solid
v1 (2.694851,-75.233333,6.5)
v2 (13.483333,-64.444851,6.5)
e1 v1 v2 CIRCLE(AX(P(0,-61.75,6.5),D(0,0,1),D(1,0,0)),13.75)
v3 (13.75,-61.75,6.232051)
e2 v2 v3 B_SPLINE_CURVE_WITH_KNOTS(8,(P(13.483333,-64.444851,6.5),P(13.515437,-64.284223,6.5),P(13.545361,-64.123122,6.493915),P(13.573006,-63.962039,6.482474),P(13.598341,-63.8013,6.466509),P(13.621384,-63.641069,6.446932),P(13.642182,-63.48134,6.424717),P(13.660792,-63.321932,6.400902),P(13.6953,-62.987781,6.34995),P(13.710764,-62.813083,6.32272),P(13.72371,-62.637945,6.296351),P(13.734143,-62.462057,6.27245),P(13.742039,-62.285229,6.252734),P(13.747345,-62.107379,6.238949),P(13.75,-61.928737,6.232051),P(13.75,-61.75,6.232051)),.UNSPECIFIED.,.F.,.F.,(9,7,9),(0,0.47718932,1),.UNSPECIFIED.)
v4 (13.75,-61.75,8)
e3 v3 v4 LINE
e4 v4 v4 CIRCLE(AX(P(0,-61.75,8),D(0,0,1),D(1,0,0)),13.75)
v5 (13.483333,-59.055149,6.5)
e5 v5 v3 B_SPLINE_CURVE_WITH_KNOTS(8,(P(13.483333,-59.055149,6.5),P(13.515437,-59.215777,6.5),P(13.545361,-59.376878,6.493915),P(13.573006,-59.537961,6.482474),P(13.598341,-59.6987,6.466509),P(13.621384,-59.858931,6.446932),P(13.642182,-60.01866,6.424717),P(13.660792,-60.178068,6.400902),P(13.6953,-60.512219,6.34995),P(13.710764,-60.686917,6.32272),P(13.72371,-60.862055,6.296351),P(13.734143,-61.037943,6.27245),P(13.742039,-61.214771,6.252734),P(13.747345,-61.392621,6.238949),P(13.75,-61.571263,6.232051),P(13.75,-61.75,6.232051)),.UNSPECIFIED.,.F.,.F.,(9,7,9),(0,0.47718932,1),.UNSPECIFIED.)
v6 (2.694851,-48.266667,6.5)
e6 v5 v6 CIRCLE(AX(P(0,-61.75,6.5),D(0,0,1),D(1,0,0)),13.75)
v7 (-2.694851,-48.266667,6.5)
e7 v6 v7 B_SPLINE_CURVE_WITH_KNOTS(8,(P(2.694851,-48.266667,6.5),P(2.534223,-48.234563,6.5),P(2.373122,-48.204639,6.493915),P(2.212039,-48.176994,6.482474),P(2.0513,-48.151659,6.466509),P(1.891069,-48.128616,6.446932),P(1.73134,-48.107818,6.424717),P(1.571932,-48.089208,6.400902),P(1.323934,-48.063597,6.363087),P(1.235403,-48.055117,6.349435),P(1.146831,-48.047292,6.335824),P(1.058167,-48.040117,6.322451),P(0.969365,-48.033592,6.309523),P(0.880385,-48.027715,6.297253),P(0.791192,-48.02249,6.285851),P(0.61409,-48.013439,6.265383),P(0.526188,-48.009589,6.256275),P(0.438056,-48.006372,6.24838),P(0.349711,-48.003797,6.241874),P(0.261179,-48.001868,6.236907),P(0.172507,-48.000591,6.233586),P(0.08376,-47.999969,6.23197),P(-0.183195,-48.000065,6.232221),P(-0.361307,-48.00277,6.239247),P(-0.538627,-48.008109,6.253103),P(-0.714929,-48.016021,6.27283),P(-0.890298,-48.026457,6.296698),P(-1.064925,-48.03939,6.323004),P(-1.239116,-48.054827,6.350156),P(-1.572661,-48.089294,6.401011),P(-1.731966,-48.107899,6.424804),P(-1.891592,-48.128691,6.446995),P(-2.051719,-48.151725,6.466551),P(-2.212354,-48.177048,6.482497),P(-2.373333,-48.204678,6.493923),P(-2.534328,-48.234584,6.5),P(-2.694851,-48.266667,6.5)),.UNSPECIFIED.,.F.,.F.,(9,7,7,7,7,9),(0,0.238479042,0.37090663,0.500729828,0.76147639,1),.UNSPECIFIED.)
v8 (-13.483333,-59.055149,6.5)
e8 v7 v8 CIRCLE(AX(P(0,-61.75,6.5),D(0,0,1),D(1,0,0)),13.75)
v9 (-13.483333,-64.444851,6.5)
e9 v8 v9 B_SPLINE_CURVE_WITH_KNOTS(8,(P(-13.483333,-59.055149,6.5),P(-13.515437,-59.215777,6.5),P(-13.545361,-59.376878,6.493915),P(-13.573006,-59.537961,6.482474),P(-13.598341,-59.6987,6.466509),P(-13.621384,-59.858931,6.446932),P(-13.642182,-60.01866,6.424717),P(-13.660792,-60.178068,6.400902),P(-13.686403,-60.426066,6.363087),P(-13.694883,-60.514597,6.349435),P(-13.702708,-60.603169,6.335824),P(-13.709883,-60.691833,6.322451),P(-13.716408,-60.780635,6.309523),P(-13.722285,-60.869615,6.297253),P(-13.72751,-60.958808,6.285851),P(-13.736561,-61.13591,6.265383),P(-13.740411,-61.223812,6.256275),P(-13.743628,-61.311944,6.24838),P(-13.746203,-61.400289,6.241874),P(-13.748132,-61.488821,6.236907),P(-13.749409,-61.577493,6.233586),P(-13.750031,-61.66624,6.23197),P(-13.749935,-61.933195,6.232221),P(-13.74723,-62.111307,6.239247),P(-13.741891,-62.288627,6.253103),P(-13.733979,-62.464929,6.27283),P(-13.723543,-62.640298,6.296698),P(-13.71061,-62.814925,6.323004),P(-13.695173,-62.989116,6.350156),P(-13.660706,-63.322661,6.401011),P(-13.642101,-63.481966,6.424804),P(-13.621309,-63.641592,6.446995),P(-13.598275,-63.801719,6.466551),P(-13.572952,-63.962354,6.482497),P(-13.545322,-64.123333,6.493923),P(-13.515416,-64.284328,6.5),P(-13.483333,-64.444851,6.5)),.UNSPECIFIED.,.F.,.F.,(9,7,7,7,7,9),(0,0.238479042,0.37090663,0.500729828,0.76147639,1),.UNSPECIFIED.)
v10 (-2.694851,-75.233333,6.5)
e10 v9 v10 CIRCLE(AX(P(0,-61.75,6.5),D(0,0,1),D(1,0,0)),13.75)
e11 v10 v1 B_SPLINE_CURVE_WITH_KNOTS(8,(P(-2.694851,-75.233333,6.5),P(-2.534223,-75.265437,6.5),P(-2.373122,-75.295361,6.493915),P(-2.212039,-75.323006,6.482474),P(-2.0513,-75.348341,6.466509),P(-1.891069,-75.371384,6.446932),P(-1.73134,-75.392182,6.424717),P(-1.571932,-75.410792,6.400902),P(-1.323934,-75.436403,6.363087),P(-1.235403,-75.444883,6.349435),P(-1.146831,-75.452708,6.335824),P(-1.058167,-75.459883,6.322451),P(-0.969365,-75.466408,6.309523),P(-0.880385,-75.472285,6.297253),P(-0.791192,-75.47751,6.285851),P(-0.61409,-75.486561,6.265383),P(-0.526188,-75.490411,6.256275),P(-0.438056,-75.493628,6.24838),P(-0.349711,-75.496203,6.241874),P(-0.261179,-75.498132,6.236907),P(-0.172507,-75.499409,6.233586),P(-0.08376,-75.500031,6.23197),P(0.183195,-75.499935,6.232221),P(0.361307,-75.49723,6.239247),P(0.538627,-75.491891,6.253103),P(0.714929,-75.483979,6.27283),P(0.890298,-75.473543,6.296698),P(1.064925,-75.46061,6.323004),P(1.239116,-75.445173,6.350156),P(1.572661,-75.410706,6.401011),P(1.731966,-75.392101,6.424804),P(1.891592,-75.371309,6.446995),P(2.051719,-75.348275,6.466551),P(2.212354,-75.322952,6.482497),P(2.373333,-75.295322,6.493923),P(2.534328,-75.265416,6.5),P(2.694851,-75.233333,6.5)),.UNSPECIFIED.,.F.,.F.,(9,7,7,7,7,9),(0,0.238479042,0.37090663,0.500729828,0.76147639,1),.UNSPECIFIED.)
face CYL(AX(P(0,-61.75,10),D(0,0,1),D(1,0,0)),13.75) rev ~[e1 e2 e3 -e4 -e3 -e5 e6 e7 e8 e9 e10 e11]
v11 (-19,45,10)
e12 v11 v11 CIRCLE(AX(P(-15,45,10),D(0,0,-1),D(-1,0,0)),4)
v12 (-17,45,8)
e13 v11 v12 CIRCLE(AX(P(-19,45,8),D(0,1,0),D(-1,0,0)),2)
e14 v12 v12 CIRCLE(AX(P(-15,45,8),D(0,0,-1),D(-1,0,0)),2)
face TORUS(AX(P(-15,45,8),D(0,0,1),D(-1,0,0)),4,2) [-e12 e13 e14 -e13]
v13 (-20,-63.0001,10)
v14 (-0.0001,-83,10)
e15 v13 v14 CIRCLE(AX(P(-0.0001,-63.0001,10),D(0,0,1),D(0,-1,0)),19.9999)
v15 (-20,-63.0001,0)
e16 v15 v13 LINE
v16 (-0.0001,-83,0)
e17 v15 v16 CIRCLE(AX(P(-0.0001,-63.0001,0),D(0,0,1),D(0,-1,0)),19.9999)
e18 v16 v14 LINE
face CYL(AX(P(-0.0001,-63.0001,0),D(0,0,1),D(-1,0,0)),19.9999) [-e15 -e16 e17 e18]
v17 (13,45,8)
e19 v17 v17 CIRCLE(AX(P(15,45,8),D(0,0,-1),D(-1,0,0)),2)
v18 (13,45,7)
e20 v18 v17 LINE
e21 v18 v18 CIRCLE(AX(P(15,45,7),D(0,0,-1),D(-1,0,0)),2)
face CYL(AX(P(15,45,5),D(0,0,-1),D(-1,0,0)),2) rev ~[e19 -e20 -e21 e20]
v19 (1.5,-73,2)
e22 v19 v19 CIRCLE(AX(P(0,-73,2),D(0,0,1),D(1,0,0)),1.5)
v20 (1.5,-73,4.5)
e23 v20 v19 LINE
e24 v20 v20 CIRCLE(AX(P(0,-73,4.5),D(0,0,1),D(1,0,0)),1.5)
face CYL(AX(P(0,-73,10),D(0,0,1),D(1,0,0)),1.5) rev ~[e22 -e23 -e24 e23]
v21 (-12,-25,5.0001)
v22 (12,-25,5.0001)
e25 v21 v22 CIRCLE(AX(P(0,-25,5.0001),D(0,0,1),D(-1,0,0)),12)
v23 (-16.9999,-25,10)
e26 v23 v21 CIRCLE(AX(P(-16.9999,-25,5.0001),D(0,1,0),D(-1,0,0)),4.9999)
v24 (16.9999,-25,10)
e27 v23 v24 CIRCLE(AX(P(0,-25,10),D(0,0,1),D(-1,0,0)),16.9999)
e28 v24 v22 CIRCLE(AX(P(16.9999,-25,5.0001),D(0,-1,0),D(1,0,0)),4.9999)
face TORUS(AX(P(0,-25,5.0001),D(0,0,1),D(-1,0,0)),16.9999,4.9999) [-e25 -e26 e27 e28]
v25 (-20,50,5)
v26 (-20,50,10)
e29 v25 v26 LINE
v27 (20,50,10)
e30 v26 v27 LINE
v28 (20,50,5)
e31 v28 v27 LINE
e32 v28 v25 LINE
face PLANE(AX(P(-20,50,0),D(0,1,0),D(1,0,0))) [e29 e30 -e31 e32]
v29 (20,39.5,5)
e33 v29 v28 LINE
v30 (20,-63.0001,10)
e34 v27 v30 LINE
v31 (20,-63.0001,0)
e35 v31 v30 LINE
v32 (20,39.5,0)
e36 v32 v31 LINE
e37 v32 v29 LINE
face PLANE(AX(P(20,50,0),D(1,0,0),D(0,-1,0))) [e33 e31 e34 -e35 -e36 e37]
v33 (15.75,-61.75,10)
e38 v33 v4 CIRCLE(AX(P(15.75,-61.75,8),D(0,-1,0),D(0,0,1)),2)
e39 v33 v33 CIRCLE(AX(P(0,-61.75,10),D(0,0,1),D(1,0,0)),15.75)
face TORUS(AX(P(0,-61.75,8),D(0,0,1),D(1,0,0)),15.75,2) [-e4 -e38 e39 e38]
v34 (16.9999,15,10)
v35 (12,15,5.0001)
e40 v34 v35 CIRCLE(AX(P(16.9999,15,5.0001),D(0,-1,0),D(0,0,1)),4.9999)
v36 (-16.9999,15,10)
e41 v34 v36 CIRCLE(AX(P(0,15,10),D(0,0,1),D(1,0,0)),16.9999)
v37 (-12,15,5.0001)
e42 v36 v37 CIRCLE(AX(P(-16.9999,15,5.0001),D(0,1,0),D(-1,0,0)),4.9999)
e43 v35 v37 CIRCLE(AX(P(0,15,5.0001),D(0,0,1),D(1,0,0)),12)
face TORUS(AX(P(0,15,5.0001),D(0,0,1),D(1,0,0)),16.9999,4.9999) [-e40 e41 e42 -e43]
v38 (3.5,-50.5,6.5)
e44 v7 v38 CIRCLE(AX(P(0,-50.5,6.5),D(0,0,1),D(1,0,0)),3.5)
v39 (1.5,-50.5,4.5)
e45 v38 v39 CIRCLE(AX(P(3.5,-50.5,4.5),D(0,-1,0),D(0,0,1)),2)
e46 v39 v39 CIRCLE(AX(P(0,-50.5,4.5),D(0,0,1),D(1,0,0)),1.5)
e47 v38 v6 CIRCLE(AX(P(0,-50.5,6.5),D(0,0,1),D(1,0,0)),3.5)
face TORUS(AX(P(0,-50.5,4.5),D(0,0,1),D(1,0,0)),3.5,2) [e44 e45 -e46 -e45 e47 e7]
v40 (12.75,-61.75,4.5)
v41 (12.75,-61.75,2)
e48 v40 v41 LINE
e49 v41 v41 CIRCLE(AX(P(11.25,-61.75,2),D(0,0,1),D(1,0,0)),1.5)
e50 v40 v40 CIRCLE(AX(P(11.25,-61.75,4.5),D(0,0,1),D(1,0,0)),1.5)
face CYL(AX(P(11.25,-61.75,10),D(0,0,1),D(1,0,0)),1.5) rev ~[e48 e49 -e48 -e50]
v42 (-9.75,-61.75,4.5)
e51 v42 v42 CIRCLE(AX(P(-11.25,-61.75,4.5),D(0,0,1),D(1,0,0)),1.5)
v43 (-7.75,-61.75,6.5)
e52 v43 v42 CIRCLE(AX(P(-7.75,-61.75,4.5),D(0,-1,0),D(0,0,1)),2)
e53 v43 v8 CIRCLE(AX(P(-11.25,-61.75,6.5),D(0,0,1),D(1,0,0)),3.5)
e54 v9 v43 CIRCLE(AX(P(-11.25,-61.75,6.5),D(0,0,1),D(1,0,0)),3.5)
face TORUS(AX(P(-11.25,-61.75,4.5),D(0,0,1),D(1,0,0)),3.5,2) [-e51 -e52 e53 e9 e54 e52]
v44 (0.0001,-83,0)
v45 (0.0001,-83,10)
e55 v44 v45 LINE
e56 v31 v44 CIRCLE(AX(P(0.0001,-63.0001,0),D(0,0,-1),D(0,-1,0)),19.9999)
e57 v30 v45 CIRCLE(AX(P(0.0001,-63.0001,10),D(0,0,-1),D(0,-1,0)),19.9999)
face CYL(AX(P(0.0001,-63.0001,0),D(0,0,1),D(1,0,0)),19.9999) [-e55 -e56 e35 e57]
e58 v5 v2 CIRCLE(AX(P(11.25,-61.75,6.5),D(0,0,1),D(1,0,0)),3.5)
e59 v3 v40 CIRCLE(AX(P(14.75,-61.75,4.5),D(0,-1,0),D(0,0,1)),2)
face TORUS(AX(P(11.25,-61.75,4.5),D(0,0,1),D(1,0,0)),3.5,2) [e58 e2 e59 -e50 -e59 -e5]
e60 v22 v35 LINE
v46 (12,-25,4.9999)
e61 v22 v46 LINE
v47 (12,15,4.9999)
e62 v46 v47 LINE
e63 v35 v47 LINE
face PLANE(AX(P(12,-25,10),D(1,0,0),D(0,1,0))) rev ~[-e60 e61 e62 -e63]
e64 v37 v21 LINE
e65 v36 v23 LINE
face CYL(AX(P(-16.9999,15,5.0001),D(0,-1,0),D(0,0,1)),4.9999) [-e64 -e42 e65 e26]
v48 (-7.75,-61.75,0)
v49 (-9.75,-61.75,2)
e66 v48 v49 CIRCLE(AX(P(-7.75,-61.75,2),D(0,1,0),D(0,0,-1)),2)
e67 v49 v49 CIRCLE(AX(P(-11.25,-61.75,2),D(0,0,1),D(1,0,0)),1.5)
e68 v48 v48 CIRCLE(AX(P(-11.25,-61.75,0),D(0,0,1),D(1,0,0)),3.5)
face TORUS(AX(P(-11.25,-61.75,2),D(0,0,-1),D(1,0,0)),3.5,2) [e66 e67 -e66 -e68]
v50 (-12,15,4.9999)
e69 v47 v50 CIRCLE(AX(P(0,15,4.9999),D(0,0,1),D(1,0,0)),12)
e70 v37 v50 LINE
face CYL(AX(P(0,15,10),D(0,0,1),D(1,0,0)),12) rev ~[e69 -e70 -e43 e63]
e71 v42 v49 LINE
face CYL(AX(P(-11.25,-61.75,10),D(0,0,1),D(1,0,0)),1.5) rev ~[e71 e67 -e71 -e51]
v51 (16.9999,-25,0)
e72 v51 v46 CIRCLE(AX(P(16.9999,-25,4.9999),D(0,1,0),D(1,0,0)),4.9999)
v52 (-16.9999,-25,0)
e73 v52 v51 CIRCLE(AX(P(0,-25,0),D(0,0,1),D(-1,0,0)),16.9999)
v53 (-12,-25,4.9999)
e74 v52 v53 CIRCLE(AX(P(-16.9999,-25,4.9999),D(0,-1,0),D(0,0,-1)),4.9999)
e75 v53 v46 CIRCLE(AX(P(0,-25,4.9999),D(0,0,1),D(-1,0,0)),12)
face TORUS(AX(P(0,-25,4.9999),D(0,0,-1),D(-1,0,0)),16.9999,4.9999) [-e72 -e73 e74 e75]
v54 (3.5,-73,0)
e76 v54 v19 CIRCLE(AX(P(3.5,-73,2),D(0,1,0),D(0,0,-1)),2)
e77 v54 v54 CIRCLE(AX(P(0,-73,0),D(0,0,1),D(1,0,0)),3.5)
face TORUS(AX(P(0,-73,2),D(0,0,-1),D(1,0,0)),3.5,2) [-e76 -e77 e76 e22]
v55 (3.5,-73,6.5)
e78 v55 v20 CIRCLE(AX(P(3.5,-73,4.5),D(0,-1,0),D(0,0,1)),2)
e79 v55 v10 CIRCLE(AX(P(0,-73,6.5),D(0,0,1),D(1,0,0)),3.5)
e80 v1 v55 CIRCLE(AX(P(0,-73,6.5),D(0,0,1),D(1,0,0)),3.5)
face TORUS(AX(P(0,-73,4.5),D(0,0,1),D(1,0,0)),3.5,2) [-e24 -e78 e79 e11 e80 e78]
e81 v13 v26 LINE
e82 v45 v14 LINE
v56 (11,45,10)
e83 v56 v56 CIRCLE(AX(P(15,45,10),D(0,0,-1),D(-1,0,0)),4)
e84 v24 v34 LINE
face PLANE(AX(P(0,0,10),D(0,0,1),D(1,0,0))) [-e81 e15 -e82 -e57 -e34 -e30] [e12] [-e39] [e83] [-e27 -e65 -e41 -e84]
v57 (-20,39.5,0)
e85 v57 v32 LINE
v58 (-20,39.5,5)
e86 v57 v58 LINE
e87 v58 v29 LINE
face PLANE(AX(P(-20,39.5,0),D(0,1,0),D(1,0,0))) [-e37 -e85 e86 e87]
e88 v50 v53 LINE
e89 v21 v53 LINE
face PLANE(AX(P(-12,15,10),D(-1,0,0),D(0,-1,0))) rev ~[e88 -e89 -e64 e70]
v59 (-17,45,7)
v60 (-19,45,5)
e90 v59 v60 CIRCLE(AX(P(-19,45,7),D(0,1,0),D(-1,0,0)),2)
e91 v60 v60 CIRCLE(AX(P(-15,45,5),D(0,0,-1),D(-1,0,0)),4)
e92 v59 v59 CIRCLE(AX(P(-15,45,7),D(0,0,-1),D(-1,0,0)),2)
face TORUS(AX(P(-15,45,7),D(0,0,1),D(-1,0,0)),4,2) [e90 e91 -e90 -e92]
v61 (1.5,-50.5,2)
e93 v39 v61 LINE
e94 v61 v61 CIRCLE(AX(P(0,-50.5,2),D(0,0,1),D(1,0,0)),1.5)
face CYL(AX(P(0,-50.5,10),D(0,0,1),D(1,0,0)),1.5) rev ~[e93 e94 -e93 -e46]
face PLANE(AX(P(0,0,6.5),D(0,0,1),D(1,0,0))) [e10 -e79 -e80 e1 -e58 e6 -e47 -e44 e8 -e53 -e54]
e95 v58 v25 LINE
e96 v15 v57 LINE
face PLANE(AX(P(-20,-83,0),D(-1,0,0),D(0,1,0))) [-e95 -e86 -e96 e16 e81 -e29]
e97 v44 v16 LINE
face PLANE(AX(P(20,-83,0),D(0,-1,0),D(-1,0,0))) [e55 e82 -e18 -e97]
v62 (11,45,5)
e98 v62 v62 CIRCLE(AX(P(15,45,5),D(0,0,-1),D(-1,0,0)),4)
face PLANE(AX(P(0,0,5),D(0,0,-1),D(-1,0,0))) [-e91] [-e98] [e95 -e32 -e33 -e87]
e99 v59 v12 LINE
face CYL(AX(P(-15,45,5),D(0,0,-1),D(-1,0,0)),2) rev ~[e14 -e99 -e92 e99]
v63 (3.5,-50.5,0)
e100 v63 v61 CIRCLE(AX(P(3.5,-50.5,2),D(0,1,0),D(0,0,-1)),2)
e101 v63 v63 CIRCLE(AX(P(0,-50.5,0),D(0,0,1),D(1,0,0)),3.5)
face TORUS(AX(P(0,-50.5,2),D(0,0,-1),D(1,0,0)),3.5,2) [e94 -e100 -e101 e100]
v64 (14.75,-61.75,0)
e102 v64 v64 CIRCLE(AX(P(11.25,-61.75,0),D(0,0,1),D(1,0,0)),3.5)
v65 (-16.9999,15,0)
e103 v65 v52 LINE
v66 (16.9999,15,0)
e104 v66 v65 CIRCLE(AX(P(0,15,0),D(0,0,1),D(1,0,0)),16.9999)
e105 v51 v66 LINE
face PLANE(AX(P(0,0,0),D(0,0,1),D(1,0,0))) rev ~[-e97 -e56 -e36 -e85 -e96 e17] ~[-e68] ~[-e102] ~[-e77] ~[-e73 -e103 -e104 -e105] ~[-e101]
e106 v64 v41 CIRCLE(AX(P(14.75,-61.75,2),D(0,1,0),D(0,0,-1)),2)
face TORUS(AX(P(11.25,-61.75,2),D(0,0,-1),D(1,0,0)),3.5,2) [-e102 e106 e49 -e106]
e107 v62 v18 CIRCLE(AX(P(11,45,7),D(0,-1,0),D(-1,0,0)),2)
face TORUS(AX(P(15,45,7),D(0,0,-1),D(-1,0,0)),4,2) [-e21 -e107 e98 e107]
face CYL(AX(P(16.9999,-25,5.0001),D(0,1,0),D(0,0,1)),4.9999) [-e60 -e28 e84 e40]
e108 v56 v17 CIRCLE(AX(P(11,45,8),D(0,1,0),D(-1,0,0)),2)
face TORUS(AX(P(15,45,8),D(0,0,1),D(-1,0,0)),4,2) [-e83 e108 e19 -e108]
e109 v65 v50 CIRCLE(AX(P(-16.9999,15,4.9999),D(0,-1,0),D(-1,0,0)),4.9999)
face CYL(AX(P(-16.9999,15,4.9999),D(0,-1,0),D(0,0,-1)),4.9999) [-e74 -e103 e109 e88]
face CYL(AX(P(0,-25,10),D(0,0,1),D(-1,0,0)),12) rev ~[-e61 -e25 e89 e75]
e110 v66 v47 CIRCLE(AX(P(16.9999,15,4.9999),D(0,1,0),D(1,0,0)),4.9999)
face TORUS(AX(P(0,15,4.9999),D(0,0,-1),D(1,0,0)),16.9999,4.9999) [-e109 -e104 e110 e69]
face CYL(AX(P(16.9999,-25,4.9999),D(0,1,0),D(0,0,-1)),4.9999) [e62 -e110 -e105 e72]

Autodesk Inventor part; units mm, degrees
ref_plane "YZ Plane" through (0, 0, 0) normal (1, 0, 0) x (0, 1, 0)
ref_plane "XZ Plane" through (0, 0, 0) normal (0, 1, 0) x (-1, 0, 0)
ref_plane "XY Plane" through (0, 0, 0) normal (0, 0, 1) x (1, 0, 0)
sketch "Sketch1" plane through (0, 0, 0) normal (0, 0, 1) x (1, 0, 0)
  line L0 (-20, 50) -> (20, 50)
  line L1 (20, 50) -> (20, -83)
  line L2 (20, -83) -> (-20, -83)
  line L3 (-20, -83) -> (-20, 50)
  point P0 (0, 0)
  dimension "d0" = 50
  dimension "d1" = 83
  dimension "d2" = 20
  dimension "d3" = 20
extrude "Extrusion1" add sketch "Sketch1" along normal blind 10
sketch "Sketch6" plane through (0, 0, 10) normal (0, 0, 1) x (1, 0, 0)
  circle A0 centre (0, -61.75) radius 13.75
  arc A1 (-18, -63) -> (18, -63) centre (0, -63) ccw projected
  line L0 (18, 20) -> (18, -83) projected
  circle A2 centre (0, -50.5) radius 1.5
  circle A3 centre (-11.25, -61.75) radius 1.5
  circle A4 centre (0, -73) radius 1.5
  circle A5 centre (11.25, -61.75) radius 1.5
  line L1 (0, 0) -> (-53.5469, 0)
  dimension "d41" = 27.5
  dimension "d42" = 5.5
  dimension "d43" = 18
  dimension "d44" = 3
  dimension "d45" = 11.25
  dimension "d46" = 18
  dimension "d49" = 360
sketch "Sketch8" plane through (0, 0, 10) normal (0, 0, 1) x (1, 0, 0)
  circle A0 centre (0, -61.75) radius 13.75
  line L0 (-18, -83) -> (-18, 20) projected
  arc A1 (-18, -63) -> (18, -63) centre (0, -63) ccw projected
  line L1 (0, 0) -> (-37.1861, 0)
  dimension "d62" = 27.5
  dimension "d63" = 18
  dimension "d64" = 1.25
extrude "Extrusion8" cut sketch "Sketch8" against normal blind 3.5
fillet "Fillet12" radius 20 2 edges at (-20, -83, 5) (20, -83, 5)
sketch "Sketch10" plane through (0, 0, 10) normal (0, 0, 1) x (1, 0, 0)
  line L0 (0, 27) -> (0, -37) construction
  line L1 (-12, 15) -> (-12, -25)
  line L2 (12, -25) -> (12, 15)
  arc A0 (12, 15) -> (-12, 15) centre (0, 15) ccw
  arc A1 (-12, -25) -> (12, -25) centre (0, -25) ccw
  line L3 (20, 50) -> (-20, 50) projected
  line L4 (20, -63) -> (20, 50) projected
  line L5 (-20, 50) -> (-20, -63) projected
  point P0 (0, 0)
  point P1 (0, -5)
  dimension "d80" = 40
  dimension "d81" = 35
  dimension "d82" = 8
  dimension "d83" = 8
extrude "Extrusion10" cut sketch "Sketch10" against normal through all
sketch "Sketch11" plane through (0, 0, 10) normal (0, 0, 1) x (1, 0, 0)
  point P0 (0, 0)
extrude "Extrusion11" cut sketch "Sketch6" against normal through all contours A2 | A3 | A4 | A5
sketch "Sketch13" plane through (0, 0, 0) normal (0, 0, -1) x (-1, 0, 0)
  line L0 (20, -63) -> (20, 50) projected
  line L1 (-20, 50) -> (20, 50)
  line L2 (20, 50) -> (20, 39.5)
  line L3 (20, 39.5) -> (-20, 39.5)
  line L4 (-20, 39.5) -> (-20, 50)
  line L5 (20, 50) -> (-20, 50) projected
  point P0 (0, 0)
  dimension "d91" = 10.5
  dimension "d92" = 0
  dimension "d93" = 40
extrude "Extrusion13" cut sketch "Sketch13" against normal blind 5
sketch "Sketch14" plane through (0, 0, 5) normal (0, 0, -1) x (-1, 0, 0)
  circle A0 centre (-15, 45) radius 2
  line L0 (20, 39.5) -> (-20, 39.5) projected
  line L1 (-20, -63) -> (-20, 50) projected
  line L2 (0, 0) -> (0, 62.9691)
  circle A1 centre (15, 45) radius 2
  line L3 (-20, 50) -> (20, 50) projected
  dimension "d96" = 4
  dimension "d98" = 5
  dimension "d105" = 5
extrude "Extrusion14" cut sketch "Sketch14" against normal blind 10 contours A0 | A1
fillet "Fillet13" radius 5 8 edges at (0, -37, 10) (-12, -5, 10) (0, 27, 10) (12, -5, 10) (0, 27, 0) (-12, -5, 0) (0, -37, 0) (12, -5, 0)
fillet "Fillet14" radius 2 2 edges at (-13, 45, 10) (17, 45, 10)
fillet "Fillet15" radius 2 2 edges at (-13, 45, 5) (17, 45, 5)
fillet "Fillet16" radius 2 9 edges at (-13.75, -61.75, 10) (-1.5, -50.5, 6.5) (9.75, -61.75, 6.5) (-12.75, -61.75, 6.5) (-1.5, -73, 6.5) (9.75, -61.75, 0) (-1.5, -50.5, 0) (-12.75, -61.75, 0) (-1.5, -73, 0)
properties part number "LowerArmPartAv2"
